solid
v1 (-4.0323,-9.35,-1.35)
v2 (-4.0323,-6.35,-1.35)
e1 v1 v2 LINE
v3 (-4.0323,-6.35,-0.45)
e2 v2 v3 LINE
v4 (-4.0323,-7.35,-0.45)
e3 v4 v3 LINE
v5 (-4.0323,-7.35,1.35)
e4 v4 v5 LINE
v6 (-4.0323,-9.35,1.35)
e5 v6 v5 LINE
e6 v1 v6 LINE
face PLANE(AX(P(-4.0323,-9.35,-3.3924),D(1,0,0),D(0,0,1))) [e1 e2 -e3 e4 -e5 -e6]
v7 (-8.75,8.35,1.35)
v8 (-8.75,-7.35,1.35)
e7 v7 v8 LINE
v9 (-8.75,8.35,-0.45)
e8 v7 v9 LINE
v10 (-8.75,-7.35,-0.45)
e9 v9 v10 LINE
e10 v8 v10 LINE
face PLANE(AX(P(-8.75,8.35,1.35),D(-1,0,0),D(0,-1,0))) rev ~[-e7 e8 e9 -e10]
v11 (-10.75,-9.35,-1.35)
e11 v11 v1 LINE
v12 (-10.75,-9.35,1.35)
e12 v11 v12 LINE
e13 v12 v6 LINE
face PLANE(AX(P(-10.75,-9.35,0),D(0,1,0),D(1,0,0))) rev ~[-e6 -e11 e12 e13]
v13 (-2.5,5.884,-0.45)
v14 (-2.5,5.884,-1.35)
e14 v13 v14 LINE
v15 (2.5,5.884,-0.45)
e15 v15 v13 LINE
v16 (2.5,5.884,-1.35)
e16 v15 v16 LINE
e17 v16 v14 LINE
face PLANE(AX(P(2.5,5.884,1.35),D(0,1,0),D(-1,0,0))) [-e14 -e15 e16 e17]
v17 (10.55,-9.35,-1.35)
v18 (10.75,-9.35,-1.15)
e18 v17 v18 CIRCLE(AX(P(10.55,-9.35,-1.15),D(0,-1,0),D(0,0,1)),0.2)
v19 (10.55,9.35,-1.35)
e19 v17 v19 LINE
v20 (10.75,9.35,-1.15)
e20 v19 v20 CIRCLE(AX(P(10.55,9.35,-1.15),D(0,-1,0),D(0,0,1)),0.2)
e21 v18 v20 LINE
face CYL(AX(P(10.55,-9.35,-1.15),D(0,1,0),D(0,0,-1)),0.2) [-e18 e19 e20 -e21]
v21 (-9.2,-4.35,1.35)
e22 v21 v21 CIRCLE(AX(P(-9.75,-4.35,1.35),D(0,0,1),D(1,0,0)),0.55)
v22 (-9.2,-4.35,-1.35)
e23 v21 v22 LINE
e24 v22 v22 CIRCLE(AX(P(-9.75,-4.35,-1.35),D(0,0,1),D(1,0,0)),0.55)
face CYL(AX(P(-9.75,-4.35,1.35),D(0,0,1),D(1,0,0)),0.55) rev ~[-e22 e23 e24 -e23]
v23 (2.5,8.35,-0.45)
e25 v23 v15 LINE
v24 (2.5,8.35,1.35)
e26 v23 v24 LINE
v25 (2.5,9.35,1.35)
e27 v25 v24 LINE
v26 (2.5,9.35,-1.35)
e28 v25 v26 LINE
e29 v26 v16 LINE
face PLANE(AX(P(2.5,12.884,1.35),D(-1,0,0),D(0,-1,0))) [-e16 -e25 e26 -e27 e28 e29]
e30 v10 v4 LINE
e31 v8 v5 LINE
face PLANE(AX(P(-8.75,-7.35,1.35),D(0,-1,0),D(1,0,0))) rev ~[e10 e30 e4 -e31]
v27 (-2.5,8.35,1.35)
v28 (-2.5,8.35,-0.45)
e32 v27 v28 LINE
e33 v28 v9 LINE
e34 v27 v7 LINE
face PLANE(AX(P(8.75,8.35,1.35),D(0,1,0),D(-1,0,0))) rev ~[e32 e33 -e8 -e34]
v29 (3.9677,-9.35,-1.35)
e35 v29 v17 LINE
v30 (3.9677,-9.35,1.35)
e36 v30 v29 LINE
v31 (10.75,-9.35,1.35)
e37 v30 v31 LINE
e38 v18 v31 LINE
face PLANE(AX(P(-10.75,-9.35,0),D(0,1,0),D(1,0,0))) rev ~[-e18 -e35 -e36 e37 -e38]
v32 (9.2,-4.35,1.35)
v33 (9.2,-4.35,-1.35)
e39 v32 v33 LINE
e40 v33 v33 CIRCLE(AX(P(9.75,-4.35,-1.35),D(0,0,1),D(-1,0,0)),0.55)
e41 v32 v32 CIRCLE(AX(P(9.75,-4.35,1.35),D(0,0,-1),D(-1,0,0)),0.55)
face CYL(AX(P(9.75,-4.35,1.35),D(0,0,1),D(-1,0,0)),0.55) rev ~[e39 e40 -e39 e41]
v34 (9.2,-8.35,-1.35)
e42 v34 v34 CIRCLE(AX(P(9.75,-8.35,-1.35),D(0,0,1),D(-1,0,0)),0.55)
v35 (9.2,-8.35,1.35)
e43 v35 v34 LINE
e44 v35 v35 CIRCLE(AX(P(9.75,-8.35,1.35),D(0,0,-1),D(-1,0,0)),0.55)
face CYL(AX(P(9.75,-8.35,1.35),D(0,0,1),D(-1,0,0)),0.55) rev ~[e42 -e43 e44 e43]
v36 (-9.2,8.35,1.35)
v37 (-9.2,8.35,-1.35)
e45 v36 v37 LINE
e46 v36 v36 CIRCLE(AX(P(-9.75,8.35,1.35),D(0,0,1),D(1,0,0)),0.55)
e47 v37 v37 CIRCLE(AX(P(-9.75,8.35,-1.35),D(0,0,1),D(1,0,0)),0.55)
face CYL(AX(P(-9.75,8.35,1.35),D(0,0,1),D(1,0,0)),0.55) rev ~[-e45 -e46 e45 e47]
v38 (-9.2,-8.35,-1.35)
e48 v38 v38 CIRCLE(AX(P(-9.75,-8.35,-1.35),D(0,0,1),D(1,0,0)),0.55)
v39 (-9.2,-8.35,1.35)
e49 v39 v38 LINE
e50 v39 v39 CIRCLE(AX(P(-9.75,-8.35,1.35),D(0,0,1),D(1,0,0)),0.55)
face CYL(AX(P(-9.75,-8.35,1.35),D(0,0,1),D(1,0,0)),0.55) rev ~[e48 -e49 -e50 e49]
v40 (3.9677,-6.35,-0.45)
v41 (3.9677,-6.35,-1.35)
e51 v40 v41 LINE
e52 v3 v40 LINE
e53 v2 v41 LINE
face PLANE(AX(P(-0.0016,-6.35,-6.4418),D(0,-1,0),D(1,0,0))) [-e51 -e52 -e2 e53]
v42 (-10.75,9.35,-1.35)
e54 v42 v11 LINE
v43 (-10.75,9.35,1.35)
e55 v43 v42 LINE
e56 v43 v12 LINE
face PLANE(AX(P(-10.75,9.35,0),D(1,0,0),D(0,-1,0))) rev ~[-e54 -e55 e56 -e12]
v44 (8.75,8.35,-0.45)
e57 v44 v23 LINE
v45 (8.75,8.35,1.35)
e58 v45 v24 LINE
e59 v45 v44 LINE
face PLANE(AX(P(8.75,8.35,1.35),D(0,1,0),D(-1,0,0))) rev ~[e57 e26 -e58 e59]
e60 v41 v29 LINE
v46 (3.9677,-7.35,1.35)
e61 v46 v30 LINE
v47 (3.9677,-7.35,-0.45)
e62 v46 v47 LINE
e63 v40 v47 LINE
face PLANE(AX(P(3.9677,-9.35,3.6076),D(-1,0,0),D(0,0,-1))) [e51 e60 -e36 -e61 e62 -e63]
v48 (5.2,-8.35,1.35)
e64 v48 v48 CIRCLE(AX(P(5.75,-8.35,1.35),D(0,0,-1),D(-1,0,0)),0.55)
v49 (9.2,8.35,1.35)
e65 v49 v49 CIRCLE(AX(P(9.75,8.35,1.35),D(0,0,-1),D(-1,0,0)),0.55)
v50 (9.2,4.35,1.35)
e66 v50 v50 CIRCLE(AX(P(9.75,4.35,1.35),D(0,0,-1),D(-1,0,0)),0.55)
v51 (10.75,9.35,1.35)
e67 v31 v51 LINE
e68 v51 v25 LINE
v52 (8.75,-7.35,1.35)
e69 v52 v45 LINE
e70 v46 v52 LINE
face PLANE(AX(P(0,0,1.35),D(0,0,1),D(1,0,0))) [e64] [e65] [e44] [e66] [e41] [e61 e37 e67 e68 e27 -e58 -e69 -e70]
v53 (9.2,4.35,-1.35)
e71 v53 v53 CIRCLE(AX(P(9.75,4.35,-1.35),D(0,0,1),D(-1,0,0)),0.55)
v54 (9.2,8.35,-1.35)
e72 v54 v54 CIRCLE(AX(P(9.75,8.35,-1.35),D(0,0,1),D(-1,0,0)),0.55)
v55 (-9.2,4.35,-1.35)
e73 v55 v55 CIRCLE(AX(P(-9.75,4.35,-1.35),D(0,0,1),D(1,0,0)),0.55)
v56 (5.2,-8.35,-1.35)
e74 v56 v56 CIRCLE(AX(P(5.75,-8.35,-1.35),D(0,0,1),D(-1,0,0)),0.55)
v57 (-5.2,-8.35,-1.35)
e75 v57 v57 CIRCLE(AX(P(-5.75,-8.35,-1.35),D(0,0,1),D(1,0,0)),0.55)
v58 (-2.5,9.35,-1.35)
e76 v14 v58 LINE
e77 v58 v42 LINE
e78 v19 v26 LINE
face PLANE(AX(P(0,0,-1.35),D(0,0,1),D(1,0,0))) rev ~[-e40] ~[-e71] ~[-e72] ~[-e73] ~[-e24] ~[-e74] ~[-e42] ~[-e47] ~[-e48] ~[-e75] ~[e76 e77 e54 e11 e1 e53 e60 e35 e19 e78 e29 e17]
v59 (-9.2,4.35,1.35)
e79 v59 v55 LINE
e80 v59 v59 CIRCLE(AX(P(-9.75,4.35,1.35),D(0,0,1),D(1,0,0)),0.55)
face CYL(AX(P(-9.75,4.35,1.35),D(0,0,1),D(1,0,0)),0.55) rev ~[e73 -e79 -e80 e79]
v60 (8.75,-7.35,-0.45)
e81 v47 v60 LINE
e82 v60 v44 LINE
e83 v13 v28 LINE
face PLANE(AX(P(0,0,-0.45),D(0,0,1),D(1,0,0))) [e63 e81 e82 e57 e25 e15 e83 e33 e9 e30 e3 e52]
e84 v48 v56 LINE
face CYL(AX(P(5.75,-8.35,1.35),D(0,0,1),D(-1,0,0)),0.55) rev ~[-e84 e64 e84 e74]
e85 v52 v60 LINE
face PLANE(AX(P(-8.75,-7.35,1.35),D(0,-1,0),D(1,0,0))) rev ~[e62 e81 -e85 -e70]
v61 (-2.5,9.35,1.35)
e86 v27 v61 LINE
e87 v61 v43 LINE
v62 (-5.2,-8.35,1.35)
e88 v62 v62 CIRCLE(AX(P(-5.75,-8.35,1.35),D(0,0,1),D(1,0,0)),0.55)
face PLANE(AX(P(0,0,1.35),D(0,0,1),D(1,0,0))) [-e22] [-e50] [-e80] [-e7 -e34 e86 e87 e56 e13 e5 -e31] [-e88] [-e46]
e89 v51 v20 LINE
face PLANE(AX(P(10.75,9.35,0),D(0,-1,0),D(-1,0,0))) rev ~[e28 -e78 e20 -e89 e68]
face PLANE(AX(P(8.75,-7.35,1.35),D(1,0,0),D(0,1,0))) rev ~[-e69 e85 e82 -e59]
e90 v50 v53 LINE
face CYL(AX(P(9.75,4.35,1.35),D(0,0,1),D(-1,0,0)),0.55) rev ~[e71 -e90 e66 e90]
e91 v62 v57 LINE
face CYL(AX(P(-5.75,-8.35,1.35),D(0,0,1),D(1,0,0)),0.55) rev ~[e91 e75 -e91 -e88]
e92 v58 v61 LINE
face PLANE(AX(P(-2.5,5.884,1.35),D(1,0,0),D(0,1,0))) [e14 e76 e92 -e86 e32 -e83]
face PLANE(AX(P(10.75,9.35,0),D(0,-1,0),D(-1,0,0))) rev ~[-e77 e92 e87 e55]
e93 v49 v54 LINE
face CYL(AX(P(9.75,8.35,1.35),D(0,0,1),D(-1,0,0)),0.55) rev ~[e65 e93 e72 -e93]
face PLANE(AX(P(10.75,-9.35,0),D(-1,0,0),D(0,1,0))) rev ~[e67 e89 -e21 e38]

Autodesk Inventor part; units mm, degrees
sketch "Sketch1" plane through (0, 0, 0) normal (0, 0, 1) x (1, 0, 0)
  line L0 (-10.75, -9.35) -> (10.75, -9.35)
  line L1 (10.75, -9.35) -> (10.75, 9.35)
  line L2 (10.75, 9.35) -> (-10.75, 9.35)
  line L3 (-10.75, 9.35) -> (-10.75, -9.35)
  line L4 (-10.75, -9.35) -> (10.75, 9.35) construction
  line L5 (10.75, -9.35) -> (-10.75, 9.35) construction
  point P0 (0, 0)
  dimension "d0" = 21.5
  dimension "d1" = 18.7
extrude "Extrusion1" add sketch "Sketch1" along normal mid plane 2.7
sketch "Sketch3" plane through (0, 0, 1.35) normal (0, 0, 1) x (1, 0, 0)
  line L0 (-8.75, -7.35) -> (8.75, -7.35)
  line L1 (8.75, -7.35) -> (8.75, 8.35)
  line L2 (8.75, 8.35) -> (-8.75, 8.35)
  line L3 (-8.75, 8.35) -> (-8.75, -7.35)
  line L4 (-8.75, -7.35) -> (8.75, 8.35) construction
  line L5 (8.75, -7.35) -> (-8.75, 8.35) construction
  line L6 (-10.75, -9.35) -> (10.75, -9.35)
  point P0 (0, 0.5)
  dimension "d8" = 17.5
  dimension "d47" = 2
  dimension "d61" = 15.7
extrude "Extrusion3" cut sketch "Sketch3" against normal blind 1.8
sketch "Sketch4" plane through (0, 0, 1.35) normal (0, 0, 1) x (1, 0, 0)
  line L0 (2.5, 5.884) -> (-2.5, 5.884)
  line L1 (-2.5, 5.884) -> (-2.5, 12.884)
  line L2 (-2.5, 12.884) -> (2.5, 12.884)
  line L3 (2.5, 12.884) -> (2.5, 5.884)
  line L4 (2.5, 5.884) -> (-2.5, 12.884) construction
  line L5 (-2.5, 5.884) -> (2.5, 12.884) construction
  point P0 (0, 0)
  point P1 (0, 9.384)
  dimension "d12" = 5
  dimension "d15" = 7
extrude "Extrusion4" cut sketch "Sketch4" against normal blind 3
sketch "Sketch7" plane through (-10.75, 0.5, 6.442) normal (1, 0, 0) x (0, -1, 0)
  line L0 (3.5, 6.442) -> (-2.5, 6.442)
  line L1 (-2.5, 6.442) -> (-2.5, 9.442)
  line L2 (-2.5, 9.442) -> (3.5, 9.442)
  line L3 (3.5, 9.442) -> (3.5, 6.442)
  line L4 (3.5, 6.442) -> (-2.5, 9.442) construction
  line L5 (-2.5, 6.442) -> (3.5, 9.442) construction
  line L6 (0.5, -1.8884) -> (0.5, 11.3304) projected
  line L7 (-8.85, 7.792) -> (-8.85, 5.092) projected
  point P0 (0, 0)
  point P1 (0.5, 7.942)
  point P2 (0.5, 7.942)
  point P3 (0.5, -1.8884)
  point P4 (0.5, 11.3304)
  point P5 (-8.85, 6.442)
  dimension "d24" = 6
  dimension "d23" = 3
extrude "Extrusion7" [suppressed]
fillet "Fillet1" [suppressed]
fillet "Fillet2" [suppressed]
fillet "Fillet3" [suppressed]
fillet "Fillet4" [suppressed]
fillet "Fillet5" [suppressed]
fillet "Fillet6" radius 0.2 1 edges at (10.75, 0, -1.35)
fillet "Fillet7" [suppressed]
fillet "Fillet8" [suppressed]
fillet "Fillet9" [suppressed]
fillet "Fillet10" [suppressed]
fillet "Fillet11" [suppressed]
mirror "Mirror2" [suppressed]
sketch "InsertPoles_Sketch" plane through (0, 0, 1.35) normal (0, 0, 1) x (1, 0, 0)
  circle A0 centre (-9.75, -8.35) radius 0.55
  line L0 (-10.75, 9.35) -> (-10.75, -9.35) projected
  line L1 (-10.75, -9.35) -> (10.75, -9.35) projected
  circle A1 centre (-9.75, -4.35) radius 0.55
  circle A2 centre (-9.75, 4.35) radius 0.55
  circle A3 centre (-9.75, 8.35) radius 0.55
  circle A4 centre (-5.75, -8.35) radius 0.55
  line L2 (-2.5, 9.35) -> (-10.75, 9.35) projected
  point P0 (0, 0)
  point P1 (-8.75, 9.35)
  dimension "d39" = 1.1
  dimension "d40" = 1
  dimension "d41" = 1
  dimension "d42" = 1.1
  dimension "d43" = 1.1
  dimension "d44" = 1.1
  dimension "d45" = 1.1
  dimension "d48" = 4
  dimension "d49" = 1
  dimension "d50" = 1
  dimension "d51" = 4
  dimension "d52" = 4
extrude "InsertPoles_Extrude" cut sketch "InsertPoles_Sketch" against normal blind 3
mirror "MirrorInsertPoles" about plane through (0, 0, 0) normal (1, 0, 0) of "InsertPoles_Extrude"
sketch "RibbonCableCutout_Sketch" plane through (0, 0, 1.35) normal (0, 0, 1) x (1, 0, 0)
  line L0 (3, -7.0087) -> (-3, -7.0087)
  line L1 (-3, -7.0087) -> (-3, -9.0087)
  line L2 (-3, -9.0087) -> (3, -9.0087)
  line L3 (3, -9.0087) -> (3, -7.0087)
  line L4 (3, -7.0087) -> (-3, -9.0087) construction
  line L5 (-3, -7.0087) -> (3, -9.0087) construction
  line L6 (0, 13.09) -> (0, -13.09) projected
  point P0 (0, 0)
  point P1 (0, -8.0087)
  point P2 (0, -8.0087)
  dimension "d56" = 6
  dimension "d57" = 2
extrude "RibbonCableCutout_Extrude" [suppressed]
fillet "Fillet12" [suppressed]
sketch "Sketch11" plane through (-0.0016, -9.35, -6.4418) normal (0, -1, 0) x (1, 0, 0)
  line L0 (3.9693, 3.0494) -> (-4.0307, 3.0494)
  line L1 (-4.0307, 3.0494) -> (-4.0307, 10.0494)
  line L2 (-4.0307, 10.0494) -> (3.9693, 10.0494)
  line L3 (3.9693, 10.0494) -> (3.9693, 3.0494)
  line L4 (3.9693, 3.0494) -> (-4.0307, 10.0494) construction
  line L5 (-4.0307, 3.0494) -> (3.9693, 10.0494) construction
  point P0 (0, 0)
  point P1 (-0.0307, 6.5494)
  dimension "d63" = 8
  dimension "d62" = 7
extrude "Extrusion10" cut sketch "Sketch11" against normal blind 3
properties part number "Checkpoint10.2_BackCover"
